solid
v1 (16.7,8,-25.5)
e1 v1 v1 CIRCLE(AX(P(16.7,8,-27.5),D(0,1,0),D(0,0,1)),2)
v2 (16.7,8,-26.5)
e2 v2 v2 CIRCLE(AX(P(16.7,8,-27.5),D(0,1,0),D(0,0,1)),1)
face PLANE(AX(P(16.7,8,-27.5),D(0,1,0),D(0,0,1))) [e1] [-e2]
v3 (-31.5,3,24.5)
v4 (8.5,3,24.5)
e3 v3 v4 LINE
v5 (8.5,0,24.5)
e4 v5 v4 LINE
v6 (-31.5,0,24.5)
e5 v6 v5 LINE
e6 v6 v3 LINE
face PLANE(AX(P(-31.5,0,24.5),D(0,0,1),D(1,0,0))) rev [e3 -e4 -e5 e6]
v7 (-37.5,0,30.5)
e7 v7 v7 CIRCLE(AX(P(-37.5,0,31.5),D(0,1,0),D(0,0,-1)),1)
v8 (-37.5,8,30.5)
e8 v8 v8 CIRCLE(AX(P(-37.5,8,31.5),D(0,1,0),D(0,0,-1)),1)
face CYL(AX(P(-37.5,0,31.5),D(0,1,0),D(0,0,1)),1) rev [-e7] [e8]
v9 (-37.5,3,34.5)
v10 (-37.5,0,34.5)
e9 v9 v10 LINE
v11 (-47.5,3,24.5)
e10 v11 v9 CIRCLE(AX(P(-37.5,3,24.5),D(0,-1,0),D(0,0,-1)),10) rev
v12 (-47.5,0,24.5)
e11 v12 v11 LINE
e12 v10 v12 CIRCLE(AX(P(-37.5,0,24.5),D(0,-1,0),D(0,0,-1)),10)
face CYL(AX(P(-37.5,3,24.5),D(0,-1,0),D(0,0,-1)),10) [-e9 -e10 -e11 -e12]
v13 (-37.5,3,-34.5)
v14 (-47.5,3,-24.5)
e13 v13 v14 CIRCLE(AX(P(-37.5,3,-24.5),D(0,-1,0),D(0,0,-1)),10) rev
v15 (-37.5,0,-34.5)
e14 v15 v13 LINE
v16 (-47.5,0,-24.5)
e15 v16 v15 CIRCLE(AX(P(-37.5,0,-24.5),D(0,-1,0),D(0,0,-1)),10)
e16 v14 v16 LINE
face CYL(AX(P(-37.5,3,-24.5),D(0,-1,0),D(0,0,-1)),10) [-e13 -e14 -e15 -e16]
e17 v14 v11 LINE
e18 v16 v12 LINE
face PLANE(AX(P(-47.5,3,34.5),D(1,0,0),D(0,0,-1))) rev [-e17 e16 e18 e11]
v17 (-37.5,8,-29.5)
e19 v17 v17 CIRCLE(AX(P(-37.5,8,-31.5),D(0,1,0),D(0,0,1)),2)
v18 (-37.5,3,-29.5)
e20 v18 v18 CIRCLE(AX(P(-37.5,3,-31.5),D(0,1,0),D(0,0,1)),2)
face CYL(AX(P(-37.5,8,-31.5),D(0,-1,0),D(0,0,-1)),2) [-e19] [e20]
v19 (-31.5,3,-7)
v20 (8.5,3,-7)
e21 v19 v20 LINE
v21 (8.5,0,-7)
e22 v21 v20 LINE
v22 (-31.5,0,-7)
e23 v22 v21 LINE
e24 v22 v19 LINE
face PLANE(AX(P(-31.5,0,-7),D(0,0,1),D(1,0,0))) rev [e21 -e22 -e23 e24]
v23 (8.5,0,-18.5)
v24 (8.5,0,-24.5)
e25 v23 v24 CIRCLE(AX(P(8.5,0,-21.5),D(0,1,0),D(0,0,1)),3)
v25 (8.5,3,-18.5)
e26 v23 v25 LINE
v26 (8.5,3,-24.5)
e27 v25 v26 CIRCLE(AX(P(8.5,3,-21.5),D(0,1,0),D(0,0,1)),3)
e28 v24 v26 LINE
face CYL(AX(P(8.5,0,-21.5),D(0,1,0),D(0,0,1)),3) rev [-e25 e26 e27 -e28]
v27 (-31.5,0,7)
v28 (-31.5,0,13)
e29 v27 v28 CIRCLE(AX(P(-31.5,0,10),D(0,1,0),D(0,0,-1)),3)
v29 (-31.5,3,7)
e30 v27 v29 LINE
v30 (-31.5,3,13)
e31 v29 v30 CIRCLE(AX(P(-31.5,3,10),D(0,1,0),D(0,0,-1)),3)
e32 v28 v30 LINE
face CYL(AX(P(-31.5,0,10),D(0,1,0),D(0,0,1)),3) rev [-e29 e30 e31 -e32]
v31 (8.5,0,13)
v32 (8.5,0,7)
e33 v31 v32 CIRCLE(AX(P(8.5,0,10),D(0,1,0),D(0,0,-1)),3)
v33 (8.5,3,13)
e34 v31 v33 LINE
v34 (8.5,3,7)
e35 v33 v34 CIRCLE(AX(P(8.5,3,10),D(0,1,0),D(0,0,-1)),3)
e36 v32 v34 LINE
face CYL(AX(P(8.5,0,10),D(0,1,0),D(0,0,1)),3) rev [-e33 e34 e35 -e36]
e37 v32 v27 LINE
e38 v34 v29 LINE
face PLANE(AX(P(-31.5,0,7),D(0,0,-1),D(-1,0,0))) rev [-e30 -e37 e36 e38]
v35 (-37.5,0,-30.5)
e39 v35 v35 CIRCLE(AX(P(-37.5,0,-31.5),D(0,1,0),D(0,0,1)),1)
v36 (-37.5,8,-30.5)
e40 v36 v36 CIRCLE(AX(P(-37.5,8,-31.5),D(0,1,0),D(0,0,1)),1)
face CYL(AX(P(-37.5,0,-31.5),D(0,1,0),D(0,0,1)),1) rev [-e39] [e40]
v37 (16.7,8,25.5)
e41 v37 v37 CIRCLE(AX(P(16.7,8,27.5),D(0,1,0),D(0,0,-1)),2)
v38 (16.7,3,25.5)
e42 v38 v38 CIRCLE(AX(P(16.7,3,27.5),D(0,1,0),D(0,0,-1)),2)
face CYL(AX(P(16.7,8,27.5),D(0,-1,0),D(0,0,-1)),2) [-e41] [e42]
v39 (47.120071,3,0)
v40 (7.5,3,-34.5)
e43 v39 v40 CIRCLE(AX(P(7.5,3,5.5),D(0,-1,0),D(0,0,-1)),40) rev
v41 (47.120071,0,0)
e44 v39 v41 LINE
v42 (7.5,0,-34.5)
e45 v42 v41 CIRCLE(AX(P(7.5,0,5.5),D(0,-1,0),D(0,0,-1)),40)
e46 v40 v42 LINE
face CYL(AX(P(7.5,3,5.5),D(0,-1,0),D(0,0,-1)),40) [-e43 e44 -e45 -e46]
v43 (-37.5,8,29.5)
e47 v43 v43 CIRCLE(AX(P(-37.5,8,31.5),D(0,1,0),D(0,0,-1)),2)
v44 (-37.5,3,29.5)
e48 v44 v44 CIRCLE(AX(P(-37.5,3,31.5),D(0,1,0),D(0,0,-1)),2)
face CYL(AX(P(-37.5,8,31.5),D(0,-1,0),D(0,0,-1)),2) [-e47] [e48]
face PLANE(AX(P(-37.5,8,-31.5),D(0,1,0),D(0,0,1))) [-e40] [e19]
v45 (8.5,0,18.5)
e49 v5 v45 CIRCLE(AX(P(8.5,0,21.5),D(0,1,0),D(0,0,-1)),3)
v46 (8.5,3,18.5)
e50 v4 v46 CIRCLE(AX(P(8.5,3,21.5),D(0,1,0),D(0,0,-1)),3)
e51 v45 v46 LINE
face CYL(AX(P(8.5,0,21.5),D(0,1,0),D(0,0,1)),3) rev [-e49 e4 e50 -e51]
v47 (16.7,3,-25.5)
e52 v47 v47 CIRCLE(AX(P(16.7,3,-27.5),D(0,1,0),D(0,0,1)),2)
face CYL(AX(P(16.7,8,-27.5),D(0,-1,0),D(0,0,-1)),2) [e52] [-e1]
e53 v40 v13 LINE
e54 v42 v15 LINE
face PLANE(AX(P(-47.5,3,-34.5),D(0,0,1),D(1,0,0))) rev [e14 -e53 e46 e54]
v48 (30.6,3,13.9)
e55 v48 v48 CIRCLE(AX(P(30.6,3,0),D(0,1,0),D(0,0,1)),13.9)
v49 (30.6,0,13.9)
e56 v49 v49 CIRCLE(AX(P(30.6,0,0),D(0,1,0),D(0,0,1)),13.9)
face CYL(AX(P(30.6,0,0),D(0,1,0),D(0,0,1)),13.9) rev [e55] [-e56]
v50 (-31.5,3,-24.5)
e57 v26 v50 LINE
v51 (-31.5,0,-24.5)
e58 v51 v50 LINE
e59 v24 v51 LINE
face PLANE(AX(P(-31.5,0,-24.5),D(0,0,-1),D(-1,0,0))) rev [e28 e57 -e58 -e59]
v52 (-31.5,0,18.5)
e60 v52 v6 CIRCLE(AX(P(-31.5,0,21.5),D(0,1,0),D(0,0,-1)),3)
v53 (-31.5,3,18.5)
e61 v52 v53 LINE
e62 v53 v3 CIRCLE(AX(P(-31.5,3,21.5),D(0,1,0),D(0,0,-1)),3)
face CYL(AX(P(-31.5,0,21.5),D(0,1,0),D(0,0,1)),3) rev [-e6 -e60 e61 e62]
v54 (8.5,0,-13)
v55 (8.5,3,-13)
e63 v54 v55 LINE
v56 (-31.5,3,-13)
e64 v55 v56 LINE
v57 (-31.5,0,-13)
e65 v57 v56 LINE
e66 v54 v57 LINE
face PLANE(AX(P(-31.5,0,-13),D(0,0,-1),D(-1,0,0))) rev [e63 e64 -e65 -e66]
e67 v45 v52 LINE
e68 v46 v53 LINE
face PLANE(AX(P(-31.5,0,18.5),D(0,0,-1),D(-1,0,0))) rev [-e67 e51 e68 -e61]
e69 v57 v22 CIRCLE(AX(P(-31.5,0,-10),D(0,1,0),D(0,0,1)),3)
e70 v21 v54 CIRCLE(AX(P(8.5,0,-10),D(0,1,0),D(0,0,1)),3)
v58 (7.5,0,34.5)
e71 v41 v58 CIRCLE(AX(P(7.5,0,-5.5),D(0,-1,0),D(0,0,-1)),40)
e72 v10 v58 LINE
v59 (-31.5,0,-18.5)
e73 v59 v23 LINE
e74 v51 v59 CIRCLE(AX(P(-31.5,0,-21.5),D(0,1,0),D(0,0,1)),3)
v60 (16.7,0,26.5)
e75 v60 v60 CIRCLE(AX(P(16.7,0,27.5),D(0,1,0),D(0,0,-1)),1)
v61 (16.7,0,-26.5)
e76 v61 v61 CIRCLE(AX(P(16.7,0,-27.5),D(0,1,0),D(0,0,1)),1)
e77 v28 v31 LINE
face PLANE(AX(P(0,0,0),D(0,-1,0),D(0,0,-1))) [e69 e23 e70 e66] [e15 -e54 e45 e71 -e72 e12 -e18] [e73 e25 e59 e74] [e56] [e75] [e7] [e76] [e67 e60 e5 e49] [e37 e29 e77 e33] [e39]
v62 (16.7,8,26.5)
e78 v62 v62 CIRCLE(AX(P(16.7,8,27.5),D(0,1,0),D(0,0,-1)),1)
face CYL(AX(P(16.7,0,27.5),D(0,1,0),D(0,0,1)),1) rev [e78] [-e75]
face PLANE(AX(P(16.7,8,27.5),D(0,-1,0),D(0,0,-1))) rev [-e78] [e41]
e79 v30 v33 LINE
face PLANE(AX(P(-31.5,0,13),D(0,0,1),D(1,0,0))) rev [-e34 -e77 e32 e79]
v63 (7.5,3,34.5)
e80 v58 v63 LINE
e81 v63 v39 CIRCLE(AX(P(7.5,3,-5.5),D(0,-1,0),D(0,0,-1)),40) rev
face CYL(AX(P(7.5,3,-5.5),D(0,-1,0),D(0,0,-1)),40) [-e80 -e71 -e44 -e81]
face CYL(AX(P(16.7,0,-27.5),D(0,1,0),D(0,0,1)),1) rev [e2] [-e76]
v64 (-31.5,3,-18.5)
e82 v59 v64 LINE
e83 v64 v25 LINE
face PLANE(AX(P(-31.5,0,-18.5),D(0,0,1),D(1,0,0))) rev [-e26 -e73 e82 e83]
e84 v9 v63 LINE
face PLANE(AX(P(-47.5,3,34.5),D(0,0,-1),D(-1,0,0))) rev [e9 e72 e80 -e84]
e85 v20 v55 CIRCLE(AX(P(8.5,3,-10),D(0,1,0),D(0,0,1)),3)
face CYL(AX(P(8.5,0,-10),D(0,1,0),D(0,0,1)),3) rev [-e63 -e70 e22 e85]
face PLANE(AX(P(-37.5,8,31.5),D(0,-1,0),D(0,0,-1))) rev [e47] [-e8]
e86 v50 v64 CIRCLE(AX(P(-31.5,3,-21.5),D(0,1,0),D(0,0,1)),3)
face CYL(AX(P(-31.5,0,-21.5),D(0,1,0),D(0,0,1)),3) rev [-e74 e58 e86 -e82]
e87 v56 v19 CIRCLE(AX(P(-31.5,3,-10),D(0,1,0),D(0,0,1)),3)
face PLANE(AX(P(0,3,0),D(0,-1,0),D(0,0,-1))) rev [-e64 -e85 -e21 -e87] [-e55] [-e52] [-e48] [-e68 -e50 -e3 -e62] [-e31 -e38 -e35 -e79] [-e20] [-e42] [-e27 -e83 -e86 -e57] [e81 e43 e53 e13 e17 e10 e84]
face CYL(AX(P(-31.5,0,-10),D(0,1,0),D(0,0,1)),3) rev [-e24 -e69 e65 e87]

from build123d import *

# Parameters (mm, degrees)
ESBO_O1_W                = 95
ESBO_O1_H                = 69
RESSALTO_EXTRUS_O1_DEPTH = 3
ESBO_O2_R                = 13.9
CORTE_EXTRUS_O1_DEPTH    = 59.783501087
ESBO_O4_R                = 1
CORTE_EXTRUS_O2_DEPTH    = 59.783501087
RESSALTO_EXTRUS_O2_START = 5
ESBO_O5_R                = 2
ESBO_O5_R_2              = 1
RESSALTO_EXTRUS_O2_DEPTH = 5
FILETE1_R                = 40
FILETE2_R                = 10
CORTE_EXTRUS_O3_DEPTH    = 59.919436521


with BuildPart() as part:
    # Esboço1 → Ressalto-extrusão1 (new body)
    with BuildSketch(Plane(origin=(0, 0, 0), x_dir=(1, 0, 0), z_dir=(0, 1, 0))):
        Rectangle(ESBO_O1_W, ESBO_O1_H)
    extrude(amount=RESSALTO_EXTRUS_O1_DEPTH)

    # Esboço2 → Corte-extrusão1 (cut, through all)
    with BuildSketch(Plane(origin=(0, 3, 0), x_dir=(1, 0, 0), z_dir=(0, 1, 0))):
        with Locations(Location((30.6, 0, 0), (0, 0, 270))):
            Circle(ESBO_O2_R)
    extrude(amount=-CORTE_EXTRUS_O1_DEPTH, mode=Mode.SUBTRACT)

    # Esboço4 → Corte-extrusão2 (cut, through all)
    with BuildSketch(Plane(origin=(0, 3, 0), x_dir=(1, 0, 0), z_dir=(0, 1, 0))):
        with Locations(Location((16.7, 27.5, 0), (0, 0, 270))):
            Circle(ESBO_O4_R)
        with Locations(Location((16.7, -27.5, 0), (0, 0, 90))):
            Circle(ESBO_O4_R)
        with Locations(Location((-37.5, 31.5, 0), (0, 0, 270))):
            Circle(ESBO_O4_R)
        with Locations(Location((-37.5, -31.5, 0), (0, 0, 90))):
            Circle(ESBO_O4_R)
    extrude(amount=-CORTE_EXTRUS_O2_DEPTH, mode=Mode.SUBTRACT)

    # Esboço5 → Ressalto-extrusão2 (add)
    # profile 1 of 4: a face of its own
    with BuildSketch(Plane(origin=(0, 3, 0), x_dir=(1, 0, 0), z_dir=(0, 1, 0)).offset(RESSALTO_EXTRUS_O2_START)):
        with Locations(Location((-37.5, 31.5, 0), (0, 0, 270))):
            Circle(ESBO_O5_R)
        with Locations(Location((-37.5, 31.5, 0), (0, 0, 270))):
            Circle(ESBO_O5_R_2, mode=Mode.SUBTRACT)
    # profile 2 of 4: a face of its own
    with BuildSketch(Plane(origin=(0, 3, 0), x_dir=(1, 0, 0), z_dir=(0, 1, 0)).offset(RESSALTO_EXTRUS_O2_START)):
        with Locations(Location((16.7, 27.5, 0), (0, 0, 270))):
            Circle(ESBO_O5_R)
        with Locations(Location((16.7, 27.5, 0), (0, 0, 270))):
            Circle(ESBO_O5_R_2, mode=Mode.SUBTRACT)
    # profile 3 of 4: a face of its own
    with BuildSketch(Plane(origin=(0, 3, 0), x_dir=(1, 0, 0), z_dir=(0, 1, 0)).offset(RESSALTO_EXTRUS_O2_START)):
        with Locations(Location((16.7, -27.5, 0), (0, 0, 90))):
            Circle(ESBO_O5_R)
        with Locations(Location((16.7, -27.5, 0), (0, 0, 90))):
            Circle(ESBO_O5_R_2, mode=Mode.SUBTRACT)
    # profile 4 of 4: a face of its own
    with BuildSketch(Plane(origin=(0, 3, 0), x_dir=(1, 0, 0), z_dir=(0, 1, 0)).offset(RESSALTO_EXTRUS_O2_START)):
        with Locations(Location((-37.5, -31.5, 0), (0, 0, 90))):
            Circle(ESBO_O5_R)
        with Locations(Location((-37.5, -31.5, 0), (0, 0, 90))):
            Circle(ESBO_O5_R_2, mode=Mode.SUBTRACT)
    extrude(amount=-RESSALTO_EXTRUS_O2_DEPTH)

    # Filete1
    # the kernel refuses this fillet: 40 mm, written as the material it takes off along each edge
    with BuildSketch(Plane(origin=(47.5, -100, -34.5), x_dir=(-1, 0, 0), z_dir=(0, 1, 0))) as filete1_piece_1:
        with BuildLine():
            CenterArc((FILETE1_R, FILETE1_R), FILETE1_R, 180, 90)
            Line((0, FILETE1_R), (0, 0))
            Line((0, 0), (FILETE1_R, 0))
        make_face()
    extrude(amount=203, mode=Mode.SUBTRACT)
    with BuildSketch(Plane(origin=(47.5, -100, 34.5), x_dir=(-1, 0, 0), z_dir=(0, 1, 0))) as filete1_piece_2:
        with BuildLine():
            CenterArc((FILETE1_R, -FILETE1_R), FILETE1_R, 90, 90)
            Line((0, -FILETE1_R), (0, 0))
            Line((0, 0), (FILETE1_R, 0))
        make_face()
    extrude(amount=203, mode=Mode.SUBTRACT)

    # Filete2
    filete2_edges = [part.edges().sort_by_distance(p)[0] for p in [
        (-47.5, 1.5, 34.5),
        (-47.5, 1.5, -34.5),
    ]]
    fillet(filete2_edges, radius=FILETE2_R)

    # Esboço7 → Corte-extrusão3 (cut, through all)
    with BuildSketch(Plane(origin=(0, 3, 0), x_dir=(1, 0, 0), z_dir=(0, 1, 0))):
        with BuildLine():
            Line((-31.5, 13), (8.5, 13))
            ThreePointArc((8.5, 13), (11.5, 10), (8.5, 7))
            Line((8.5, 7), (-31.5, 7))
            ThreePointArc((-31.5, 7), (-34.5, 10), (-31.5, 13))
        make_face()
        with BuildLine():
            Line((-31.5, 24.5), (8.5, 24.5))
            ThreePointArc((8.5, 24.5), (11.5, 21.5), (8.5, 18.5))
            Line((8.5, 18.5), (-31.5, 18.5))
            ThreePointArc((-31.5, 18.5), (-34.5, 21.5), (-31.5, 24.5))
        make_face()
        with BuildLine():
            Line((-31.5, -24.5), (8.5, -24.5))
            ThreePointArc((8.5, -24.5), (11.5, -21.5), (8.5, -18.5))
            Line((8.5, -18.5), (-31.5, -18.5))
            ThreePointArc((-31.5, -18.5), (-34.5, -21.5), (-31.5, -24.5))
        make_face()
        with BuildLine():
            Line((-31.5, -13), (8.5, -13))
            ThreePointArc((8.5, -13), (11.5, -10), (8.5, -7))
            Line((8.5, -7), (-31.5, -7))
            ThreePointArc((-31.5, -7), (-34.5, -10), (-31.5, -13))
        make_face()
    extrude(amount=-CORTE_EXTRUS_O3_DEPTH, mode=Mode.SUBTRACT)


solid = part.part
